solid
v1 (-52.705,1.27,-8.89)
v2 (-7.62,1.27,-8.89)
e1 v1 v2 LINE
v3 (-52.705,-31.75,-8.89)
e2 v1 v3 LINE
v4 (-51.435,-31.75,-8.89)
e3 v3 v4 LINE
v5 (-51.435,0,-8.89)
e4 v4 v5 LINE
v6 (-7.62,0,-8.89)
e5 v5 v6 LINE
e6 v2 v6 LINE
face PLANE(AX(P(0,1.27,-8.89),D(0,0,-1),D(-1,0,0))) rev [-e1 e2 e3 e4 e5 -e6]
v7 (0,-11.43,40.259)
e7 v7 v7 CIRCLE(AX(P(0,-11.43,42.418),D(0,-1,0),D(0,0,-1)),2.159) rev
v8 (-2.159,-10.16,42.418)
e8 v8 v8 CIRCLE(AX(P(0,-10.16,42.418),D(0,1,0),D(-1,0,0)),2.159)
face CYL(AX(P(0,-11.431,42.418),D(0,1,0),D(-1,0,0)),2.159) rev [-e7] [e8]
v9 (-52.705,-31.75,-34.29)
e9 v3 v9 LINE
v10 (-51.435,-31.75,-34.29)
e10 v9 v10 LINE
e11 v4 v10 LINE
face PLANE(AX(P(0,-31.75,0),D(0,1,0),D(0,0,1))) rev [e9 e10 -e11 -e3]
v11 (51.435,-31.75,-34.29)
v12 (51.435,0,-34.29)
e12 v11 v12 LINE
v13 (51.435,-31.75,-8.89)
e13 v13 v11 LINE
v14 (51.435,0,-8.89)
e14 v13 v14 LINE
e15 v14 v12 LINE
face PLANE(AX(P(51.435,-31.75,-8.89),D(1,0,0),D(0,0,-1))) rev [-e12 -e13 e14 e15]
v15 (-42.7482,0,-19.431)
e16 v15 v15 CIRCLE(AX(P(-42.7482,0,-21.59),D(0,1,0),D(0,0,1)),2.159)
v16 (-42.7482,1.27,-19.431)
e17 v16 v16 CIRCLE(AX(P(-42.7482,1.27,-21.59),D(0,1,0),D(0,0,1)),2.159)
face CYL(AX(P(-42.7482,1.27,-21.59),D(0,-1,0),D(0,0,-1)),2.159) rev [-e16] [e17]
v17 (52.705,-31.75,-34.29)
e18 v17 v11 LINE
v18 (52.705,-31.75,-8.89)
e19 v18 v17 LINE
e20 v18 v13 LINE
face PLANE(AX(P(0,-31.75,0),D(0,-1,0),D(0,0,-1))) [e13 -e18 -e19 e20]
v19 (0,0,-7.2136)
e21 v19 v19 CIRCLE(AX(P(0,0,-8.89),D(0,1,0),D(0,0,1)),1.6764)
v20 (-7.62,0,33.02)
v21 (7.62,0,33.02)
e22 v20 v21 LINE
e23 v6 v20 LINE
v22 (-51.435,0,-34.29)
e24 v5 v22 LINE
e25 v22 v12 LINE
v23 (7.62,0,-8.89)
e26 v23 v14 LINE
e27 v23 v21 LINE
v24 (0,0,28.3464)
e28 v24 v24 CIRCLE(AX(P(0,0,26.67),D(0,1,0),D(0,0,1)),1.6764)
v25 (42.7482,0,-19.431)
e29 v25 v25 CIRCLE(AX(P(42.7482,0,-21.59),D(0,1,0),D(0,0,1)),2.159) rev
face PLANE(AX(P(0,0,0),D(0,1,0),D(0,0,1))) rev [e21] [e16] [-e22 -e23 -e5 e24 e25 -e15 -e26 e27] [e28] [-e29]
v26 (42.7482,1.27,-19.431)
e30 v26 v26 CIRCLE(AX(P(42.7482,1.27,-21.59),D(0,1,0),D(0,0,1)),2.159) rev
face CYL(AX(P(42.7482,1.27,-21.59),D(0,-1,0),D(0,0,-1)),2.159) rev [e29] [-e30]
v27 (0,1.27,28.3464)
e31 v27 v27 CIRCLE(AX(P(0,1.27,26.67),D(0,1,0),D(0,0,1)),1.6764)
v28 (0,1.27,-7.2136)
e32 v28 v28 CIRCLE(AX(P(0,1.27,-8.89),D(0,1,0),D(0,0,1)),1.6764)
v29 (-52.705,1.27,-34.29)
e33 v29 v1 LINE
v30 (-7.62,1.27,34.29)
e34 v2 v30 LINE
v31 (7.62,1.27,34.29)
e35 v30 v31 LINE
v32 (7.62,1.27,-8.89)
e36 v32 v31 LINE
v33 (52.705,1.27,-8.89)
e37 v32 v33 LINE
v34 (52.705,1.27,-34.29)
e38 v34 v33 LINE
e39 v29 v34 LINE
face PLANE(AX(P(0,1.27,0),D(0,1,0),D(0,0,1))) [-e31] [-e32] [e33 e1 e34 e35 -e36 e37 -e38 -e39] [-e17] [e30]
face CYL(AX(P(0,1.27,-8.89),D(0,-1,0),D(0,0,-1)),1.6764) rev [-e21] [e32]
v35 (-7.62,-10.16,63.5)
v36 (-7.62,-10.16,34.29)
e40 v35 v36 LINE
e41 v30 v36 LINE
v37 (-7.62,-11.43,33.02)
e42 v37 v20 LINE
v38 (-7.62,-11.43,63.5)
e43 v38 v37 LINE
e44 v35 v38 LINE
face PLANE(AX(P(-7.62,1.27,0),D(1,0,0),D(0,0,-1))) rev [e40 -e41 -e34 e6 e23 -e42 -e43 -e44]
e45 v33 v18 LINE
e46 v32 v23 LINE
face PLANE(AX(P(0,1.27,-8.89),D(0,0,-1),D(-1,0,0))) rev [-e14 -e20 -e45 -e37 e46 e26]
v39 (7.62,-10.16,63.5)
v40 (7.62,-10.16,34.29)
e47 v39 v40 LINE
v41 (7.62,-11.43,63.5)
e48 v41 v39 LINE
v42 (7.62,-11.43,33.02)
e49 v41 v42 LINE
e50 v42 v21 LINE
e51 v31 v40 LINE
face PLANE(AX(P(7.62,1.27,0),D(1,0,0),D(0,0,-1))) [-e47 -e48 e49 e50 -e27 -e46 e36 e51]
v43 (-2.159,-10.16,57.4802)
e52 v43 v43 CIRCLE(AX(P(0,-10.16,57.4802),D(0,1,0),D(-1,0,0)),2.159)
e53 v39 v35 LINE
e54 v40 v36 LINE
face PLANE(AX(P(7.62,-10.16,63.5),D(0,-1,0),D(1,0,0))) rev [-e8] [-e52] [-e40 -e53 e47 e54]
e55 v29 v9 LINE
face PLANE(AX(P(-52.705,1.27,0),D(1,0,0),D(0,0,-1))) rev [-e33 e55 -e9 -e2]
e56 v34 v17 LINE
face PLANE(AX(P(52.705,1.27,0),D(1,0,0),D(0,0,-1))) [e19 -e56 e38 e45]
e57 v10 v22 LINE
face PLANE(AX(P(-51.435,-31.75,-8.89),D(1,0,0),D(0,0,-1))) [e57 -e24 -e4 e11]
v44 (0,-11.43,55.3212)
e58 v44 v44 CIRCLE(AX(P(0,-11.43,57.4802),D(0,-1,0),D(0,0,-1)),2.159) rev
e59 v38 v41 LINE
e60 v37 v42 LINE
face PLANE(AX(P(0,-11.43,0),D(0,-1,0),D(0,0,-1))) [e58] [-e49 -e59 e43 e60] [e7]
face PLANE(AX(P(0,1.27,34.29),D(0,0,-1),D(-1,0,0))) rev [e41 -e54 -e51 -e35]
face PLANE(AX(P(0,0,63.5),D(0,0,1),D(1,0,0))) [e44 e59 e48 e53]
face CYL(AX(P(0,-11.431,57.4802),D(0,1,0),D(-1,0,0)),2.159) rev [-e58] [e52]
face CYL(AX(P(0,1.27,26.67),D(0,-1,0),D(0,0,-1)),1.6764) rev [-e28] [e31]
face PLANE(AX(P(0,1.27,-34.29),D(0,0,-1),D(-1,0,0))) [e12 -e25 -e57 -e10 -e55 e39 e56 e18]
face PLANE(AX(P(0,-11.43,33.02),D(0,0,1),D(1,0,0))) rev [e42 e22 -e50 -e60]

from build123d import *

# Parameters (mm, degrees)
BSSXTRD_CLIPTOPFACE_OUTLINE_R   = 1.6764
BSSXTRD_CLIPTOPFACE_OUTLINE_R_2 = 2.159
BSSXTRD_CLIPTOPFACE_DEPTH       = 1.27
SKTCH_CLIPSTANDOFFCROSSSEC_W    = 15.24
SKTCH_CLIPSTANDOFFCROSSSEC_H    = 1.27
BSSXTRD_CLIPLEG_DEPTH           = 11.43
SKTCH_CLIPFOOTCROSSSEC_W        = 15.24
SKTCH_CLIPFOOTCROSSSEC_H        = 1.27
BSSXTRD_CLIPFOOT_DEPTH          = 29.21
CTXTRD_CLIPFOOTHOLES_REACH      = 85.311
SKTCH_CLIPFOOTHOLES_R           = 2.159
SKTCH_CLIPSTANDOFFCROSSSEC_3_W  = 1.27
SKTCH_CLIPSTANDOFFCROSSSEC_3_H  = 25.4
BSSXTRD_CLIPTABS_DEPTH          = 31.75


# Read off the part's stored shape, not the designer's step: BssXtrd_ClipTopFace
with BuildPart() as part:
    # BssXtrd_ClipTopFace outline → BssXtrd_ClipTopFace (new body)
    with BuildSketch(Plane(origin=(0, 0, 0), x_dir=(1, 0, 0), z_dir=(0, 1, 0))):
        Polygon((-7.62, -34.29), (7.62, -34.29), (7.62, 8.89), (52.705, 8.89), (52.705, 34.29), (-52.705, 34.29), (-52.705, 8.89), (-7.62, 8.89), align=None)
        with Locations((0, -26.67)):
            Circle(BSSXTRD_CLIPTOPFACE_OUTLINE_R, mode=Mode.SUBTRACT)
        with Locations((-42.7482, 21.59)):
            Circle(BSSXTRD_CLIPTOPFACE_OUTLINE_R_2, mode=Mode.SUBTRACT)
        with Locations((0, 8.89)):
            Circle(BSSXTRD_CLIPTOPFACE_OUTLINE_R, mode=Mode.SUBTRACT)
        with Locations((42.7482, 21.59)):
            Circle(BSSXTRD_CLIPTOPFACE_OUTLINE_R_2, mode=Mode.SUBTRACT)
    extrude(amount=BSSXTRD_CLIPTOPFACE_DEPTH)

    # Sktch_ClipStandoffCrossSec → BssXtrd_ClipLeg (add)
    with BuildSketch(Plane.XZ):
        with Locations((0, 33.655)):
            Rectangle(SKTCH_CLIPSTANDOFFCROSSSEC_W, SKTCH_CLIPSTANDOFFCROSSSEC_H)
    extrude(amount=BSSXTRD_CLIPLEG_DEPTH)

    # Sktch_ClipFootCrossSec → BssXtrd_ClipFoot (add)
    with BuildSketch(Plane.XY.offset(34.29)):
        with Locations((0, -10.795)):
            Rectangle(SKTCH_CLIPFOOTCROSSSEC_W, SKTCH_CLIPFOOTCROSSSEC_H)
    extrude(amount=BSSXTRD_CLIPFOOT_DEPTH)

    # Sktch_ClipFootHoles → CtXtrd_ClipFootHoles (cut, up to next)
    with BuildSketch(Plane(origin=(0, -10.16, 0), x_dir=(1, 0, 0), z_dir=(0, 1, 0)), mode=Mode.PRIVATE) as ctxtrd_clipfootholes_sk1:
        with Locations(Location((0, -42.418, 0), (0, 0, 180))):
            Circle(SKTCH_CLIPFOOTHOLES_R)
    ctxtrd_clipfootholes_tool1 = extrude(ctxtrd_clipfootholes_sk1.sketch, amount=-CTXTRD_CLIPFOOTHOLES_REACH, mode=Mode.PRIVATE) & part.part
    # Sktch_ClipFootHoles → CtXtrd_ClipFootHoles (cut, up to next)
    with BuildSketch(Plane(origin=(0, -10.16, 0), x_dir=(1, 0, 0), z_dir=(0, 1, 0)), mode=Mode.PRIVATE) as ctxtrd_clipfootholes_sk2:
        with Locations(Location((0, -57.4802, 0), (0, 0, 180))):
            Circle(SKTCH_CLIPFOOTHOLES_R)
    ctxtrd_clipfootholes_tool2 = extrude(ctxtrd_clipfootholes_sk2.sketch, amount=-CTXTRD_CLIPFOOTHOLES_REACH, mode=Mode.PRIVATE) & part.part
    add(ctxtrd_clipfootholes_tool1.solids().sort_by_distance((0, -10.16, 42.418))[0], mode=Mode.SUBTRACT)
    add(ctxtrd_clipfootholes_tool2.solids().sort_by_distance((0, -10.16, 57.4802))[0], mode=Mode.SUBTRACT)

    # Sktch_ClipStandoffCrossSec<3> → BssXtrd_ClipTabs (add)
    with BuildSketch(Plane.XZ):
        with Locations((52.07, -21.59)):
            Rectangle(SKTCH_CLIPSTANDOFFCROSSSEC_3_W, SKTCH_CLIPSTANDOFFCROSSSEC_3_H)
        with Locations((-52.07, -21.59)):
            Rectangle(SKTCH_CLIPSTANDOFFCROSSSEC_3_W, SKTCH_CLIPSTANDOFFCROSSSEC_3_H)
    extrude(amount=BSSXTRD_CLIPTABS_DEPTH)


solid = part.part
